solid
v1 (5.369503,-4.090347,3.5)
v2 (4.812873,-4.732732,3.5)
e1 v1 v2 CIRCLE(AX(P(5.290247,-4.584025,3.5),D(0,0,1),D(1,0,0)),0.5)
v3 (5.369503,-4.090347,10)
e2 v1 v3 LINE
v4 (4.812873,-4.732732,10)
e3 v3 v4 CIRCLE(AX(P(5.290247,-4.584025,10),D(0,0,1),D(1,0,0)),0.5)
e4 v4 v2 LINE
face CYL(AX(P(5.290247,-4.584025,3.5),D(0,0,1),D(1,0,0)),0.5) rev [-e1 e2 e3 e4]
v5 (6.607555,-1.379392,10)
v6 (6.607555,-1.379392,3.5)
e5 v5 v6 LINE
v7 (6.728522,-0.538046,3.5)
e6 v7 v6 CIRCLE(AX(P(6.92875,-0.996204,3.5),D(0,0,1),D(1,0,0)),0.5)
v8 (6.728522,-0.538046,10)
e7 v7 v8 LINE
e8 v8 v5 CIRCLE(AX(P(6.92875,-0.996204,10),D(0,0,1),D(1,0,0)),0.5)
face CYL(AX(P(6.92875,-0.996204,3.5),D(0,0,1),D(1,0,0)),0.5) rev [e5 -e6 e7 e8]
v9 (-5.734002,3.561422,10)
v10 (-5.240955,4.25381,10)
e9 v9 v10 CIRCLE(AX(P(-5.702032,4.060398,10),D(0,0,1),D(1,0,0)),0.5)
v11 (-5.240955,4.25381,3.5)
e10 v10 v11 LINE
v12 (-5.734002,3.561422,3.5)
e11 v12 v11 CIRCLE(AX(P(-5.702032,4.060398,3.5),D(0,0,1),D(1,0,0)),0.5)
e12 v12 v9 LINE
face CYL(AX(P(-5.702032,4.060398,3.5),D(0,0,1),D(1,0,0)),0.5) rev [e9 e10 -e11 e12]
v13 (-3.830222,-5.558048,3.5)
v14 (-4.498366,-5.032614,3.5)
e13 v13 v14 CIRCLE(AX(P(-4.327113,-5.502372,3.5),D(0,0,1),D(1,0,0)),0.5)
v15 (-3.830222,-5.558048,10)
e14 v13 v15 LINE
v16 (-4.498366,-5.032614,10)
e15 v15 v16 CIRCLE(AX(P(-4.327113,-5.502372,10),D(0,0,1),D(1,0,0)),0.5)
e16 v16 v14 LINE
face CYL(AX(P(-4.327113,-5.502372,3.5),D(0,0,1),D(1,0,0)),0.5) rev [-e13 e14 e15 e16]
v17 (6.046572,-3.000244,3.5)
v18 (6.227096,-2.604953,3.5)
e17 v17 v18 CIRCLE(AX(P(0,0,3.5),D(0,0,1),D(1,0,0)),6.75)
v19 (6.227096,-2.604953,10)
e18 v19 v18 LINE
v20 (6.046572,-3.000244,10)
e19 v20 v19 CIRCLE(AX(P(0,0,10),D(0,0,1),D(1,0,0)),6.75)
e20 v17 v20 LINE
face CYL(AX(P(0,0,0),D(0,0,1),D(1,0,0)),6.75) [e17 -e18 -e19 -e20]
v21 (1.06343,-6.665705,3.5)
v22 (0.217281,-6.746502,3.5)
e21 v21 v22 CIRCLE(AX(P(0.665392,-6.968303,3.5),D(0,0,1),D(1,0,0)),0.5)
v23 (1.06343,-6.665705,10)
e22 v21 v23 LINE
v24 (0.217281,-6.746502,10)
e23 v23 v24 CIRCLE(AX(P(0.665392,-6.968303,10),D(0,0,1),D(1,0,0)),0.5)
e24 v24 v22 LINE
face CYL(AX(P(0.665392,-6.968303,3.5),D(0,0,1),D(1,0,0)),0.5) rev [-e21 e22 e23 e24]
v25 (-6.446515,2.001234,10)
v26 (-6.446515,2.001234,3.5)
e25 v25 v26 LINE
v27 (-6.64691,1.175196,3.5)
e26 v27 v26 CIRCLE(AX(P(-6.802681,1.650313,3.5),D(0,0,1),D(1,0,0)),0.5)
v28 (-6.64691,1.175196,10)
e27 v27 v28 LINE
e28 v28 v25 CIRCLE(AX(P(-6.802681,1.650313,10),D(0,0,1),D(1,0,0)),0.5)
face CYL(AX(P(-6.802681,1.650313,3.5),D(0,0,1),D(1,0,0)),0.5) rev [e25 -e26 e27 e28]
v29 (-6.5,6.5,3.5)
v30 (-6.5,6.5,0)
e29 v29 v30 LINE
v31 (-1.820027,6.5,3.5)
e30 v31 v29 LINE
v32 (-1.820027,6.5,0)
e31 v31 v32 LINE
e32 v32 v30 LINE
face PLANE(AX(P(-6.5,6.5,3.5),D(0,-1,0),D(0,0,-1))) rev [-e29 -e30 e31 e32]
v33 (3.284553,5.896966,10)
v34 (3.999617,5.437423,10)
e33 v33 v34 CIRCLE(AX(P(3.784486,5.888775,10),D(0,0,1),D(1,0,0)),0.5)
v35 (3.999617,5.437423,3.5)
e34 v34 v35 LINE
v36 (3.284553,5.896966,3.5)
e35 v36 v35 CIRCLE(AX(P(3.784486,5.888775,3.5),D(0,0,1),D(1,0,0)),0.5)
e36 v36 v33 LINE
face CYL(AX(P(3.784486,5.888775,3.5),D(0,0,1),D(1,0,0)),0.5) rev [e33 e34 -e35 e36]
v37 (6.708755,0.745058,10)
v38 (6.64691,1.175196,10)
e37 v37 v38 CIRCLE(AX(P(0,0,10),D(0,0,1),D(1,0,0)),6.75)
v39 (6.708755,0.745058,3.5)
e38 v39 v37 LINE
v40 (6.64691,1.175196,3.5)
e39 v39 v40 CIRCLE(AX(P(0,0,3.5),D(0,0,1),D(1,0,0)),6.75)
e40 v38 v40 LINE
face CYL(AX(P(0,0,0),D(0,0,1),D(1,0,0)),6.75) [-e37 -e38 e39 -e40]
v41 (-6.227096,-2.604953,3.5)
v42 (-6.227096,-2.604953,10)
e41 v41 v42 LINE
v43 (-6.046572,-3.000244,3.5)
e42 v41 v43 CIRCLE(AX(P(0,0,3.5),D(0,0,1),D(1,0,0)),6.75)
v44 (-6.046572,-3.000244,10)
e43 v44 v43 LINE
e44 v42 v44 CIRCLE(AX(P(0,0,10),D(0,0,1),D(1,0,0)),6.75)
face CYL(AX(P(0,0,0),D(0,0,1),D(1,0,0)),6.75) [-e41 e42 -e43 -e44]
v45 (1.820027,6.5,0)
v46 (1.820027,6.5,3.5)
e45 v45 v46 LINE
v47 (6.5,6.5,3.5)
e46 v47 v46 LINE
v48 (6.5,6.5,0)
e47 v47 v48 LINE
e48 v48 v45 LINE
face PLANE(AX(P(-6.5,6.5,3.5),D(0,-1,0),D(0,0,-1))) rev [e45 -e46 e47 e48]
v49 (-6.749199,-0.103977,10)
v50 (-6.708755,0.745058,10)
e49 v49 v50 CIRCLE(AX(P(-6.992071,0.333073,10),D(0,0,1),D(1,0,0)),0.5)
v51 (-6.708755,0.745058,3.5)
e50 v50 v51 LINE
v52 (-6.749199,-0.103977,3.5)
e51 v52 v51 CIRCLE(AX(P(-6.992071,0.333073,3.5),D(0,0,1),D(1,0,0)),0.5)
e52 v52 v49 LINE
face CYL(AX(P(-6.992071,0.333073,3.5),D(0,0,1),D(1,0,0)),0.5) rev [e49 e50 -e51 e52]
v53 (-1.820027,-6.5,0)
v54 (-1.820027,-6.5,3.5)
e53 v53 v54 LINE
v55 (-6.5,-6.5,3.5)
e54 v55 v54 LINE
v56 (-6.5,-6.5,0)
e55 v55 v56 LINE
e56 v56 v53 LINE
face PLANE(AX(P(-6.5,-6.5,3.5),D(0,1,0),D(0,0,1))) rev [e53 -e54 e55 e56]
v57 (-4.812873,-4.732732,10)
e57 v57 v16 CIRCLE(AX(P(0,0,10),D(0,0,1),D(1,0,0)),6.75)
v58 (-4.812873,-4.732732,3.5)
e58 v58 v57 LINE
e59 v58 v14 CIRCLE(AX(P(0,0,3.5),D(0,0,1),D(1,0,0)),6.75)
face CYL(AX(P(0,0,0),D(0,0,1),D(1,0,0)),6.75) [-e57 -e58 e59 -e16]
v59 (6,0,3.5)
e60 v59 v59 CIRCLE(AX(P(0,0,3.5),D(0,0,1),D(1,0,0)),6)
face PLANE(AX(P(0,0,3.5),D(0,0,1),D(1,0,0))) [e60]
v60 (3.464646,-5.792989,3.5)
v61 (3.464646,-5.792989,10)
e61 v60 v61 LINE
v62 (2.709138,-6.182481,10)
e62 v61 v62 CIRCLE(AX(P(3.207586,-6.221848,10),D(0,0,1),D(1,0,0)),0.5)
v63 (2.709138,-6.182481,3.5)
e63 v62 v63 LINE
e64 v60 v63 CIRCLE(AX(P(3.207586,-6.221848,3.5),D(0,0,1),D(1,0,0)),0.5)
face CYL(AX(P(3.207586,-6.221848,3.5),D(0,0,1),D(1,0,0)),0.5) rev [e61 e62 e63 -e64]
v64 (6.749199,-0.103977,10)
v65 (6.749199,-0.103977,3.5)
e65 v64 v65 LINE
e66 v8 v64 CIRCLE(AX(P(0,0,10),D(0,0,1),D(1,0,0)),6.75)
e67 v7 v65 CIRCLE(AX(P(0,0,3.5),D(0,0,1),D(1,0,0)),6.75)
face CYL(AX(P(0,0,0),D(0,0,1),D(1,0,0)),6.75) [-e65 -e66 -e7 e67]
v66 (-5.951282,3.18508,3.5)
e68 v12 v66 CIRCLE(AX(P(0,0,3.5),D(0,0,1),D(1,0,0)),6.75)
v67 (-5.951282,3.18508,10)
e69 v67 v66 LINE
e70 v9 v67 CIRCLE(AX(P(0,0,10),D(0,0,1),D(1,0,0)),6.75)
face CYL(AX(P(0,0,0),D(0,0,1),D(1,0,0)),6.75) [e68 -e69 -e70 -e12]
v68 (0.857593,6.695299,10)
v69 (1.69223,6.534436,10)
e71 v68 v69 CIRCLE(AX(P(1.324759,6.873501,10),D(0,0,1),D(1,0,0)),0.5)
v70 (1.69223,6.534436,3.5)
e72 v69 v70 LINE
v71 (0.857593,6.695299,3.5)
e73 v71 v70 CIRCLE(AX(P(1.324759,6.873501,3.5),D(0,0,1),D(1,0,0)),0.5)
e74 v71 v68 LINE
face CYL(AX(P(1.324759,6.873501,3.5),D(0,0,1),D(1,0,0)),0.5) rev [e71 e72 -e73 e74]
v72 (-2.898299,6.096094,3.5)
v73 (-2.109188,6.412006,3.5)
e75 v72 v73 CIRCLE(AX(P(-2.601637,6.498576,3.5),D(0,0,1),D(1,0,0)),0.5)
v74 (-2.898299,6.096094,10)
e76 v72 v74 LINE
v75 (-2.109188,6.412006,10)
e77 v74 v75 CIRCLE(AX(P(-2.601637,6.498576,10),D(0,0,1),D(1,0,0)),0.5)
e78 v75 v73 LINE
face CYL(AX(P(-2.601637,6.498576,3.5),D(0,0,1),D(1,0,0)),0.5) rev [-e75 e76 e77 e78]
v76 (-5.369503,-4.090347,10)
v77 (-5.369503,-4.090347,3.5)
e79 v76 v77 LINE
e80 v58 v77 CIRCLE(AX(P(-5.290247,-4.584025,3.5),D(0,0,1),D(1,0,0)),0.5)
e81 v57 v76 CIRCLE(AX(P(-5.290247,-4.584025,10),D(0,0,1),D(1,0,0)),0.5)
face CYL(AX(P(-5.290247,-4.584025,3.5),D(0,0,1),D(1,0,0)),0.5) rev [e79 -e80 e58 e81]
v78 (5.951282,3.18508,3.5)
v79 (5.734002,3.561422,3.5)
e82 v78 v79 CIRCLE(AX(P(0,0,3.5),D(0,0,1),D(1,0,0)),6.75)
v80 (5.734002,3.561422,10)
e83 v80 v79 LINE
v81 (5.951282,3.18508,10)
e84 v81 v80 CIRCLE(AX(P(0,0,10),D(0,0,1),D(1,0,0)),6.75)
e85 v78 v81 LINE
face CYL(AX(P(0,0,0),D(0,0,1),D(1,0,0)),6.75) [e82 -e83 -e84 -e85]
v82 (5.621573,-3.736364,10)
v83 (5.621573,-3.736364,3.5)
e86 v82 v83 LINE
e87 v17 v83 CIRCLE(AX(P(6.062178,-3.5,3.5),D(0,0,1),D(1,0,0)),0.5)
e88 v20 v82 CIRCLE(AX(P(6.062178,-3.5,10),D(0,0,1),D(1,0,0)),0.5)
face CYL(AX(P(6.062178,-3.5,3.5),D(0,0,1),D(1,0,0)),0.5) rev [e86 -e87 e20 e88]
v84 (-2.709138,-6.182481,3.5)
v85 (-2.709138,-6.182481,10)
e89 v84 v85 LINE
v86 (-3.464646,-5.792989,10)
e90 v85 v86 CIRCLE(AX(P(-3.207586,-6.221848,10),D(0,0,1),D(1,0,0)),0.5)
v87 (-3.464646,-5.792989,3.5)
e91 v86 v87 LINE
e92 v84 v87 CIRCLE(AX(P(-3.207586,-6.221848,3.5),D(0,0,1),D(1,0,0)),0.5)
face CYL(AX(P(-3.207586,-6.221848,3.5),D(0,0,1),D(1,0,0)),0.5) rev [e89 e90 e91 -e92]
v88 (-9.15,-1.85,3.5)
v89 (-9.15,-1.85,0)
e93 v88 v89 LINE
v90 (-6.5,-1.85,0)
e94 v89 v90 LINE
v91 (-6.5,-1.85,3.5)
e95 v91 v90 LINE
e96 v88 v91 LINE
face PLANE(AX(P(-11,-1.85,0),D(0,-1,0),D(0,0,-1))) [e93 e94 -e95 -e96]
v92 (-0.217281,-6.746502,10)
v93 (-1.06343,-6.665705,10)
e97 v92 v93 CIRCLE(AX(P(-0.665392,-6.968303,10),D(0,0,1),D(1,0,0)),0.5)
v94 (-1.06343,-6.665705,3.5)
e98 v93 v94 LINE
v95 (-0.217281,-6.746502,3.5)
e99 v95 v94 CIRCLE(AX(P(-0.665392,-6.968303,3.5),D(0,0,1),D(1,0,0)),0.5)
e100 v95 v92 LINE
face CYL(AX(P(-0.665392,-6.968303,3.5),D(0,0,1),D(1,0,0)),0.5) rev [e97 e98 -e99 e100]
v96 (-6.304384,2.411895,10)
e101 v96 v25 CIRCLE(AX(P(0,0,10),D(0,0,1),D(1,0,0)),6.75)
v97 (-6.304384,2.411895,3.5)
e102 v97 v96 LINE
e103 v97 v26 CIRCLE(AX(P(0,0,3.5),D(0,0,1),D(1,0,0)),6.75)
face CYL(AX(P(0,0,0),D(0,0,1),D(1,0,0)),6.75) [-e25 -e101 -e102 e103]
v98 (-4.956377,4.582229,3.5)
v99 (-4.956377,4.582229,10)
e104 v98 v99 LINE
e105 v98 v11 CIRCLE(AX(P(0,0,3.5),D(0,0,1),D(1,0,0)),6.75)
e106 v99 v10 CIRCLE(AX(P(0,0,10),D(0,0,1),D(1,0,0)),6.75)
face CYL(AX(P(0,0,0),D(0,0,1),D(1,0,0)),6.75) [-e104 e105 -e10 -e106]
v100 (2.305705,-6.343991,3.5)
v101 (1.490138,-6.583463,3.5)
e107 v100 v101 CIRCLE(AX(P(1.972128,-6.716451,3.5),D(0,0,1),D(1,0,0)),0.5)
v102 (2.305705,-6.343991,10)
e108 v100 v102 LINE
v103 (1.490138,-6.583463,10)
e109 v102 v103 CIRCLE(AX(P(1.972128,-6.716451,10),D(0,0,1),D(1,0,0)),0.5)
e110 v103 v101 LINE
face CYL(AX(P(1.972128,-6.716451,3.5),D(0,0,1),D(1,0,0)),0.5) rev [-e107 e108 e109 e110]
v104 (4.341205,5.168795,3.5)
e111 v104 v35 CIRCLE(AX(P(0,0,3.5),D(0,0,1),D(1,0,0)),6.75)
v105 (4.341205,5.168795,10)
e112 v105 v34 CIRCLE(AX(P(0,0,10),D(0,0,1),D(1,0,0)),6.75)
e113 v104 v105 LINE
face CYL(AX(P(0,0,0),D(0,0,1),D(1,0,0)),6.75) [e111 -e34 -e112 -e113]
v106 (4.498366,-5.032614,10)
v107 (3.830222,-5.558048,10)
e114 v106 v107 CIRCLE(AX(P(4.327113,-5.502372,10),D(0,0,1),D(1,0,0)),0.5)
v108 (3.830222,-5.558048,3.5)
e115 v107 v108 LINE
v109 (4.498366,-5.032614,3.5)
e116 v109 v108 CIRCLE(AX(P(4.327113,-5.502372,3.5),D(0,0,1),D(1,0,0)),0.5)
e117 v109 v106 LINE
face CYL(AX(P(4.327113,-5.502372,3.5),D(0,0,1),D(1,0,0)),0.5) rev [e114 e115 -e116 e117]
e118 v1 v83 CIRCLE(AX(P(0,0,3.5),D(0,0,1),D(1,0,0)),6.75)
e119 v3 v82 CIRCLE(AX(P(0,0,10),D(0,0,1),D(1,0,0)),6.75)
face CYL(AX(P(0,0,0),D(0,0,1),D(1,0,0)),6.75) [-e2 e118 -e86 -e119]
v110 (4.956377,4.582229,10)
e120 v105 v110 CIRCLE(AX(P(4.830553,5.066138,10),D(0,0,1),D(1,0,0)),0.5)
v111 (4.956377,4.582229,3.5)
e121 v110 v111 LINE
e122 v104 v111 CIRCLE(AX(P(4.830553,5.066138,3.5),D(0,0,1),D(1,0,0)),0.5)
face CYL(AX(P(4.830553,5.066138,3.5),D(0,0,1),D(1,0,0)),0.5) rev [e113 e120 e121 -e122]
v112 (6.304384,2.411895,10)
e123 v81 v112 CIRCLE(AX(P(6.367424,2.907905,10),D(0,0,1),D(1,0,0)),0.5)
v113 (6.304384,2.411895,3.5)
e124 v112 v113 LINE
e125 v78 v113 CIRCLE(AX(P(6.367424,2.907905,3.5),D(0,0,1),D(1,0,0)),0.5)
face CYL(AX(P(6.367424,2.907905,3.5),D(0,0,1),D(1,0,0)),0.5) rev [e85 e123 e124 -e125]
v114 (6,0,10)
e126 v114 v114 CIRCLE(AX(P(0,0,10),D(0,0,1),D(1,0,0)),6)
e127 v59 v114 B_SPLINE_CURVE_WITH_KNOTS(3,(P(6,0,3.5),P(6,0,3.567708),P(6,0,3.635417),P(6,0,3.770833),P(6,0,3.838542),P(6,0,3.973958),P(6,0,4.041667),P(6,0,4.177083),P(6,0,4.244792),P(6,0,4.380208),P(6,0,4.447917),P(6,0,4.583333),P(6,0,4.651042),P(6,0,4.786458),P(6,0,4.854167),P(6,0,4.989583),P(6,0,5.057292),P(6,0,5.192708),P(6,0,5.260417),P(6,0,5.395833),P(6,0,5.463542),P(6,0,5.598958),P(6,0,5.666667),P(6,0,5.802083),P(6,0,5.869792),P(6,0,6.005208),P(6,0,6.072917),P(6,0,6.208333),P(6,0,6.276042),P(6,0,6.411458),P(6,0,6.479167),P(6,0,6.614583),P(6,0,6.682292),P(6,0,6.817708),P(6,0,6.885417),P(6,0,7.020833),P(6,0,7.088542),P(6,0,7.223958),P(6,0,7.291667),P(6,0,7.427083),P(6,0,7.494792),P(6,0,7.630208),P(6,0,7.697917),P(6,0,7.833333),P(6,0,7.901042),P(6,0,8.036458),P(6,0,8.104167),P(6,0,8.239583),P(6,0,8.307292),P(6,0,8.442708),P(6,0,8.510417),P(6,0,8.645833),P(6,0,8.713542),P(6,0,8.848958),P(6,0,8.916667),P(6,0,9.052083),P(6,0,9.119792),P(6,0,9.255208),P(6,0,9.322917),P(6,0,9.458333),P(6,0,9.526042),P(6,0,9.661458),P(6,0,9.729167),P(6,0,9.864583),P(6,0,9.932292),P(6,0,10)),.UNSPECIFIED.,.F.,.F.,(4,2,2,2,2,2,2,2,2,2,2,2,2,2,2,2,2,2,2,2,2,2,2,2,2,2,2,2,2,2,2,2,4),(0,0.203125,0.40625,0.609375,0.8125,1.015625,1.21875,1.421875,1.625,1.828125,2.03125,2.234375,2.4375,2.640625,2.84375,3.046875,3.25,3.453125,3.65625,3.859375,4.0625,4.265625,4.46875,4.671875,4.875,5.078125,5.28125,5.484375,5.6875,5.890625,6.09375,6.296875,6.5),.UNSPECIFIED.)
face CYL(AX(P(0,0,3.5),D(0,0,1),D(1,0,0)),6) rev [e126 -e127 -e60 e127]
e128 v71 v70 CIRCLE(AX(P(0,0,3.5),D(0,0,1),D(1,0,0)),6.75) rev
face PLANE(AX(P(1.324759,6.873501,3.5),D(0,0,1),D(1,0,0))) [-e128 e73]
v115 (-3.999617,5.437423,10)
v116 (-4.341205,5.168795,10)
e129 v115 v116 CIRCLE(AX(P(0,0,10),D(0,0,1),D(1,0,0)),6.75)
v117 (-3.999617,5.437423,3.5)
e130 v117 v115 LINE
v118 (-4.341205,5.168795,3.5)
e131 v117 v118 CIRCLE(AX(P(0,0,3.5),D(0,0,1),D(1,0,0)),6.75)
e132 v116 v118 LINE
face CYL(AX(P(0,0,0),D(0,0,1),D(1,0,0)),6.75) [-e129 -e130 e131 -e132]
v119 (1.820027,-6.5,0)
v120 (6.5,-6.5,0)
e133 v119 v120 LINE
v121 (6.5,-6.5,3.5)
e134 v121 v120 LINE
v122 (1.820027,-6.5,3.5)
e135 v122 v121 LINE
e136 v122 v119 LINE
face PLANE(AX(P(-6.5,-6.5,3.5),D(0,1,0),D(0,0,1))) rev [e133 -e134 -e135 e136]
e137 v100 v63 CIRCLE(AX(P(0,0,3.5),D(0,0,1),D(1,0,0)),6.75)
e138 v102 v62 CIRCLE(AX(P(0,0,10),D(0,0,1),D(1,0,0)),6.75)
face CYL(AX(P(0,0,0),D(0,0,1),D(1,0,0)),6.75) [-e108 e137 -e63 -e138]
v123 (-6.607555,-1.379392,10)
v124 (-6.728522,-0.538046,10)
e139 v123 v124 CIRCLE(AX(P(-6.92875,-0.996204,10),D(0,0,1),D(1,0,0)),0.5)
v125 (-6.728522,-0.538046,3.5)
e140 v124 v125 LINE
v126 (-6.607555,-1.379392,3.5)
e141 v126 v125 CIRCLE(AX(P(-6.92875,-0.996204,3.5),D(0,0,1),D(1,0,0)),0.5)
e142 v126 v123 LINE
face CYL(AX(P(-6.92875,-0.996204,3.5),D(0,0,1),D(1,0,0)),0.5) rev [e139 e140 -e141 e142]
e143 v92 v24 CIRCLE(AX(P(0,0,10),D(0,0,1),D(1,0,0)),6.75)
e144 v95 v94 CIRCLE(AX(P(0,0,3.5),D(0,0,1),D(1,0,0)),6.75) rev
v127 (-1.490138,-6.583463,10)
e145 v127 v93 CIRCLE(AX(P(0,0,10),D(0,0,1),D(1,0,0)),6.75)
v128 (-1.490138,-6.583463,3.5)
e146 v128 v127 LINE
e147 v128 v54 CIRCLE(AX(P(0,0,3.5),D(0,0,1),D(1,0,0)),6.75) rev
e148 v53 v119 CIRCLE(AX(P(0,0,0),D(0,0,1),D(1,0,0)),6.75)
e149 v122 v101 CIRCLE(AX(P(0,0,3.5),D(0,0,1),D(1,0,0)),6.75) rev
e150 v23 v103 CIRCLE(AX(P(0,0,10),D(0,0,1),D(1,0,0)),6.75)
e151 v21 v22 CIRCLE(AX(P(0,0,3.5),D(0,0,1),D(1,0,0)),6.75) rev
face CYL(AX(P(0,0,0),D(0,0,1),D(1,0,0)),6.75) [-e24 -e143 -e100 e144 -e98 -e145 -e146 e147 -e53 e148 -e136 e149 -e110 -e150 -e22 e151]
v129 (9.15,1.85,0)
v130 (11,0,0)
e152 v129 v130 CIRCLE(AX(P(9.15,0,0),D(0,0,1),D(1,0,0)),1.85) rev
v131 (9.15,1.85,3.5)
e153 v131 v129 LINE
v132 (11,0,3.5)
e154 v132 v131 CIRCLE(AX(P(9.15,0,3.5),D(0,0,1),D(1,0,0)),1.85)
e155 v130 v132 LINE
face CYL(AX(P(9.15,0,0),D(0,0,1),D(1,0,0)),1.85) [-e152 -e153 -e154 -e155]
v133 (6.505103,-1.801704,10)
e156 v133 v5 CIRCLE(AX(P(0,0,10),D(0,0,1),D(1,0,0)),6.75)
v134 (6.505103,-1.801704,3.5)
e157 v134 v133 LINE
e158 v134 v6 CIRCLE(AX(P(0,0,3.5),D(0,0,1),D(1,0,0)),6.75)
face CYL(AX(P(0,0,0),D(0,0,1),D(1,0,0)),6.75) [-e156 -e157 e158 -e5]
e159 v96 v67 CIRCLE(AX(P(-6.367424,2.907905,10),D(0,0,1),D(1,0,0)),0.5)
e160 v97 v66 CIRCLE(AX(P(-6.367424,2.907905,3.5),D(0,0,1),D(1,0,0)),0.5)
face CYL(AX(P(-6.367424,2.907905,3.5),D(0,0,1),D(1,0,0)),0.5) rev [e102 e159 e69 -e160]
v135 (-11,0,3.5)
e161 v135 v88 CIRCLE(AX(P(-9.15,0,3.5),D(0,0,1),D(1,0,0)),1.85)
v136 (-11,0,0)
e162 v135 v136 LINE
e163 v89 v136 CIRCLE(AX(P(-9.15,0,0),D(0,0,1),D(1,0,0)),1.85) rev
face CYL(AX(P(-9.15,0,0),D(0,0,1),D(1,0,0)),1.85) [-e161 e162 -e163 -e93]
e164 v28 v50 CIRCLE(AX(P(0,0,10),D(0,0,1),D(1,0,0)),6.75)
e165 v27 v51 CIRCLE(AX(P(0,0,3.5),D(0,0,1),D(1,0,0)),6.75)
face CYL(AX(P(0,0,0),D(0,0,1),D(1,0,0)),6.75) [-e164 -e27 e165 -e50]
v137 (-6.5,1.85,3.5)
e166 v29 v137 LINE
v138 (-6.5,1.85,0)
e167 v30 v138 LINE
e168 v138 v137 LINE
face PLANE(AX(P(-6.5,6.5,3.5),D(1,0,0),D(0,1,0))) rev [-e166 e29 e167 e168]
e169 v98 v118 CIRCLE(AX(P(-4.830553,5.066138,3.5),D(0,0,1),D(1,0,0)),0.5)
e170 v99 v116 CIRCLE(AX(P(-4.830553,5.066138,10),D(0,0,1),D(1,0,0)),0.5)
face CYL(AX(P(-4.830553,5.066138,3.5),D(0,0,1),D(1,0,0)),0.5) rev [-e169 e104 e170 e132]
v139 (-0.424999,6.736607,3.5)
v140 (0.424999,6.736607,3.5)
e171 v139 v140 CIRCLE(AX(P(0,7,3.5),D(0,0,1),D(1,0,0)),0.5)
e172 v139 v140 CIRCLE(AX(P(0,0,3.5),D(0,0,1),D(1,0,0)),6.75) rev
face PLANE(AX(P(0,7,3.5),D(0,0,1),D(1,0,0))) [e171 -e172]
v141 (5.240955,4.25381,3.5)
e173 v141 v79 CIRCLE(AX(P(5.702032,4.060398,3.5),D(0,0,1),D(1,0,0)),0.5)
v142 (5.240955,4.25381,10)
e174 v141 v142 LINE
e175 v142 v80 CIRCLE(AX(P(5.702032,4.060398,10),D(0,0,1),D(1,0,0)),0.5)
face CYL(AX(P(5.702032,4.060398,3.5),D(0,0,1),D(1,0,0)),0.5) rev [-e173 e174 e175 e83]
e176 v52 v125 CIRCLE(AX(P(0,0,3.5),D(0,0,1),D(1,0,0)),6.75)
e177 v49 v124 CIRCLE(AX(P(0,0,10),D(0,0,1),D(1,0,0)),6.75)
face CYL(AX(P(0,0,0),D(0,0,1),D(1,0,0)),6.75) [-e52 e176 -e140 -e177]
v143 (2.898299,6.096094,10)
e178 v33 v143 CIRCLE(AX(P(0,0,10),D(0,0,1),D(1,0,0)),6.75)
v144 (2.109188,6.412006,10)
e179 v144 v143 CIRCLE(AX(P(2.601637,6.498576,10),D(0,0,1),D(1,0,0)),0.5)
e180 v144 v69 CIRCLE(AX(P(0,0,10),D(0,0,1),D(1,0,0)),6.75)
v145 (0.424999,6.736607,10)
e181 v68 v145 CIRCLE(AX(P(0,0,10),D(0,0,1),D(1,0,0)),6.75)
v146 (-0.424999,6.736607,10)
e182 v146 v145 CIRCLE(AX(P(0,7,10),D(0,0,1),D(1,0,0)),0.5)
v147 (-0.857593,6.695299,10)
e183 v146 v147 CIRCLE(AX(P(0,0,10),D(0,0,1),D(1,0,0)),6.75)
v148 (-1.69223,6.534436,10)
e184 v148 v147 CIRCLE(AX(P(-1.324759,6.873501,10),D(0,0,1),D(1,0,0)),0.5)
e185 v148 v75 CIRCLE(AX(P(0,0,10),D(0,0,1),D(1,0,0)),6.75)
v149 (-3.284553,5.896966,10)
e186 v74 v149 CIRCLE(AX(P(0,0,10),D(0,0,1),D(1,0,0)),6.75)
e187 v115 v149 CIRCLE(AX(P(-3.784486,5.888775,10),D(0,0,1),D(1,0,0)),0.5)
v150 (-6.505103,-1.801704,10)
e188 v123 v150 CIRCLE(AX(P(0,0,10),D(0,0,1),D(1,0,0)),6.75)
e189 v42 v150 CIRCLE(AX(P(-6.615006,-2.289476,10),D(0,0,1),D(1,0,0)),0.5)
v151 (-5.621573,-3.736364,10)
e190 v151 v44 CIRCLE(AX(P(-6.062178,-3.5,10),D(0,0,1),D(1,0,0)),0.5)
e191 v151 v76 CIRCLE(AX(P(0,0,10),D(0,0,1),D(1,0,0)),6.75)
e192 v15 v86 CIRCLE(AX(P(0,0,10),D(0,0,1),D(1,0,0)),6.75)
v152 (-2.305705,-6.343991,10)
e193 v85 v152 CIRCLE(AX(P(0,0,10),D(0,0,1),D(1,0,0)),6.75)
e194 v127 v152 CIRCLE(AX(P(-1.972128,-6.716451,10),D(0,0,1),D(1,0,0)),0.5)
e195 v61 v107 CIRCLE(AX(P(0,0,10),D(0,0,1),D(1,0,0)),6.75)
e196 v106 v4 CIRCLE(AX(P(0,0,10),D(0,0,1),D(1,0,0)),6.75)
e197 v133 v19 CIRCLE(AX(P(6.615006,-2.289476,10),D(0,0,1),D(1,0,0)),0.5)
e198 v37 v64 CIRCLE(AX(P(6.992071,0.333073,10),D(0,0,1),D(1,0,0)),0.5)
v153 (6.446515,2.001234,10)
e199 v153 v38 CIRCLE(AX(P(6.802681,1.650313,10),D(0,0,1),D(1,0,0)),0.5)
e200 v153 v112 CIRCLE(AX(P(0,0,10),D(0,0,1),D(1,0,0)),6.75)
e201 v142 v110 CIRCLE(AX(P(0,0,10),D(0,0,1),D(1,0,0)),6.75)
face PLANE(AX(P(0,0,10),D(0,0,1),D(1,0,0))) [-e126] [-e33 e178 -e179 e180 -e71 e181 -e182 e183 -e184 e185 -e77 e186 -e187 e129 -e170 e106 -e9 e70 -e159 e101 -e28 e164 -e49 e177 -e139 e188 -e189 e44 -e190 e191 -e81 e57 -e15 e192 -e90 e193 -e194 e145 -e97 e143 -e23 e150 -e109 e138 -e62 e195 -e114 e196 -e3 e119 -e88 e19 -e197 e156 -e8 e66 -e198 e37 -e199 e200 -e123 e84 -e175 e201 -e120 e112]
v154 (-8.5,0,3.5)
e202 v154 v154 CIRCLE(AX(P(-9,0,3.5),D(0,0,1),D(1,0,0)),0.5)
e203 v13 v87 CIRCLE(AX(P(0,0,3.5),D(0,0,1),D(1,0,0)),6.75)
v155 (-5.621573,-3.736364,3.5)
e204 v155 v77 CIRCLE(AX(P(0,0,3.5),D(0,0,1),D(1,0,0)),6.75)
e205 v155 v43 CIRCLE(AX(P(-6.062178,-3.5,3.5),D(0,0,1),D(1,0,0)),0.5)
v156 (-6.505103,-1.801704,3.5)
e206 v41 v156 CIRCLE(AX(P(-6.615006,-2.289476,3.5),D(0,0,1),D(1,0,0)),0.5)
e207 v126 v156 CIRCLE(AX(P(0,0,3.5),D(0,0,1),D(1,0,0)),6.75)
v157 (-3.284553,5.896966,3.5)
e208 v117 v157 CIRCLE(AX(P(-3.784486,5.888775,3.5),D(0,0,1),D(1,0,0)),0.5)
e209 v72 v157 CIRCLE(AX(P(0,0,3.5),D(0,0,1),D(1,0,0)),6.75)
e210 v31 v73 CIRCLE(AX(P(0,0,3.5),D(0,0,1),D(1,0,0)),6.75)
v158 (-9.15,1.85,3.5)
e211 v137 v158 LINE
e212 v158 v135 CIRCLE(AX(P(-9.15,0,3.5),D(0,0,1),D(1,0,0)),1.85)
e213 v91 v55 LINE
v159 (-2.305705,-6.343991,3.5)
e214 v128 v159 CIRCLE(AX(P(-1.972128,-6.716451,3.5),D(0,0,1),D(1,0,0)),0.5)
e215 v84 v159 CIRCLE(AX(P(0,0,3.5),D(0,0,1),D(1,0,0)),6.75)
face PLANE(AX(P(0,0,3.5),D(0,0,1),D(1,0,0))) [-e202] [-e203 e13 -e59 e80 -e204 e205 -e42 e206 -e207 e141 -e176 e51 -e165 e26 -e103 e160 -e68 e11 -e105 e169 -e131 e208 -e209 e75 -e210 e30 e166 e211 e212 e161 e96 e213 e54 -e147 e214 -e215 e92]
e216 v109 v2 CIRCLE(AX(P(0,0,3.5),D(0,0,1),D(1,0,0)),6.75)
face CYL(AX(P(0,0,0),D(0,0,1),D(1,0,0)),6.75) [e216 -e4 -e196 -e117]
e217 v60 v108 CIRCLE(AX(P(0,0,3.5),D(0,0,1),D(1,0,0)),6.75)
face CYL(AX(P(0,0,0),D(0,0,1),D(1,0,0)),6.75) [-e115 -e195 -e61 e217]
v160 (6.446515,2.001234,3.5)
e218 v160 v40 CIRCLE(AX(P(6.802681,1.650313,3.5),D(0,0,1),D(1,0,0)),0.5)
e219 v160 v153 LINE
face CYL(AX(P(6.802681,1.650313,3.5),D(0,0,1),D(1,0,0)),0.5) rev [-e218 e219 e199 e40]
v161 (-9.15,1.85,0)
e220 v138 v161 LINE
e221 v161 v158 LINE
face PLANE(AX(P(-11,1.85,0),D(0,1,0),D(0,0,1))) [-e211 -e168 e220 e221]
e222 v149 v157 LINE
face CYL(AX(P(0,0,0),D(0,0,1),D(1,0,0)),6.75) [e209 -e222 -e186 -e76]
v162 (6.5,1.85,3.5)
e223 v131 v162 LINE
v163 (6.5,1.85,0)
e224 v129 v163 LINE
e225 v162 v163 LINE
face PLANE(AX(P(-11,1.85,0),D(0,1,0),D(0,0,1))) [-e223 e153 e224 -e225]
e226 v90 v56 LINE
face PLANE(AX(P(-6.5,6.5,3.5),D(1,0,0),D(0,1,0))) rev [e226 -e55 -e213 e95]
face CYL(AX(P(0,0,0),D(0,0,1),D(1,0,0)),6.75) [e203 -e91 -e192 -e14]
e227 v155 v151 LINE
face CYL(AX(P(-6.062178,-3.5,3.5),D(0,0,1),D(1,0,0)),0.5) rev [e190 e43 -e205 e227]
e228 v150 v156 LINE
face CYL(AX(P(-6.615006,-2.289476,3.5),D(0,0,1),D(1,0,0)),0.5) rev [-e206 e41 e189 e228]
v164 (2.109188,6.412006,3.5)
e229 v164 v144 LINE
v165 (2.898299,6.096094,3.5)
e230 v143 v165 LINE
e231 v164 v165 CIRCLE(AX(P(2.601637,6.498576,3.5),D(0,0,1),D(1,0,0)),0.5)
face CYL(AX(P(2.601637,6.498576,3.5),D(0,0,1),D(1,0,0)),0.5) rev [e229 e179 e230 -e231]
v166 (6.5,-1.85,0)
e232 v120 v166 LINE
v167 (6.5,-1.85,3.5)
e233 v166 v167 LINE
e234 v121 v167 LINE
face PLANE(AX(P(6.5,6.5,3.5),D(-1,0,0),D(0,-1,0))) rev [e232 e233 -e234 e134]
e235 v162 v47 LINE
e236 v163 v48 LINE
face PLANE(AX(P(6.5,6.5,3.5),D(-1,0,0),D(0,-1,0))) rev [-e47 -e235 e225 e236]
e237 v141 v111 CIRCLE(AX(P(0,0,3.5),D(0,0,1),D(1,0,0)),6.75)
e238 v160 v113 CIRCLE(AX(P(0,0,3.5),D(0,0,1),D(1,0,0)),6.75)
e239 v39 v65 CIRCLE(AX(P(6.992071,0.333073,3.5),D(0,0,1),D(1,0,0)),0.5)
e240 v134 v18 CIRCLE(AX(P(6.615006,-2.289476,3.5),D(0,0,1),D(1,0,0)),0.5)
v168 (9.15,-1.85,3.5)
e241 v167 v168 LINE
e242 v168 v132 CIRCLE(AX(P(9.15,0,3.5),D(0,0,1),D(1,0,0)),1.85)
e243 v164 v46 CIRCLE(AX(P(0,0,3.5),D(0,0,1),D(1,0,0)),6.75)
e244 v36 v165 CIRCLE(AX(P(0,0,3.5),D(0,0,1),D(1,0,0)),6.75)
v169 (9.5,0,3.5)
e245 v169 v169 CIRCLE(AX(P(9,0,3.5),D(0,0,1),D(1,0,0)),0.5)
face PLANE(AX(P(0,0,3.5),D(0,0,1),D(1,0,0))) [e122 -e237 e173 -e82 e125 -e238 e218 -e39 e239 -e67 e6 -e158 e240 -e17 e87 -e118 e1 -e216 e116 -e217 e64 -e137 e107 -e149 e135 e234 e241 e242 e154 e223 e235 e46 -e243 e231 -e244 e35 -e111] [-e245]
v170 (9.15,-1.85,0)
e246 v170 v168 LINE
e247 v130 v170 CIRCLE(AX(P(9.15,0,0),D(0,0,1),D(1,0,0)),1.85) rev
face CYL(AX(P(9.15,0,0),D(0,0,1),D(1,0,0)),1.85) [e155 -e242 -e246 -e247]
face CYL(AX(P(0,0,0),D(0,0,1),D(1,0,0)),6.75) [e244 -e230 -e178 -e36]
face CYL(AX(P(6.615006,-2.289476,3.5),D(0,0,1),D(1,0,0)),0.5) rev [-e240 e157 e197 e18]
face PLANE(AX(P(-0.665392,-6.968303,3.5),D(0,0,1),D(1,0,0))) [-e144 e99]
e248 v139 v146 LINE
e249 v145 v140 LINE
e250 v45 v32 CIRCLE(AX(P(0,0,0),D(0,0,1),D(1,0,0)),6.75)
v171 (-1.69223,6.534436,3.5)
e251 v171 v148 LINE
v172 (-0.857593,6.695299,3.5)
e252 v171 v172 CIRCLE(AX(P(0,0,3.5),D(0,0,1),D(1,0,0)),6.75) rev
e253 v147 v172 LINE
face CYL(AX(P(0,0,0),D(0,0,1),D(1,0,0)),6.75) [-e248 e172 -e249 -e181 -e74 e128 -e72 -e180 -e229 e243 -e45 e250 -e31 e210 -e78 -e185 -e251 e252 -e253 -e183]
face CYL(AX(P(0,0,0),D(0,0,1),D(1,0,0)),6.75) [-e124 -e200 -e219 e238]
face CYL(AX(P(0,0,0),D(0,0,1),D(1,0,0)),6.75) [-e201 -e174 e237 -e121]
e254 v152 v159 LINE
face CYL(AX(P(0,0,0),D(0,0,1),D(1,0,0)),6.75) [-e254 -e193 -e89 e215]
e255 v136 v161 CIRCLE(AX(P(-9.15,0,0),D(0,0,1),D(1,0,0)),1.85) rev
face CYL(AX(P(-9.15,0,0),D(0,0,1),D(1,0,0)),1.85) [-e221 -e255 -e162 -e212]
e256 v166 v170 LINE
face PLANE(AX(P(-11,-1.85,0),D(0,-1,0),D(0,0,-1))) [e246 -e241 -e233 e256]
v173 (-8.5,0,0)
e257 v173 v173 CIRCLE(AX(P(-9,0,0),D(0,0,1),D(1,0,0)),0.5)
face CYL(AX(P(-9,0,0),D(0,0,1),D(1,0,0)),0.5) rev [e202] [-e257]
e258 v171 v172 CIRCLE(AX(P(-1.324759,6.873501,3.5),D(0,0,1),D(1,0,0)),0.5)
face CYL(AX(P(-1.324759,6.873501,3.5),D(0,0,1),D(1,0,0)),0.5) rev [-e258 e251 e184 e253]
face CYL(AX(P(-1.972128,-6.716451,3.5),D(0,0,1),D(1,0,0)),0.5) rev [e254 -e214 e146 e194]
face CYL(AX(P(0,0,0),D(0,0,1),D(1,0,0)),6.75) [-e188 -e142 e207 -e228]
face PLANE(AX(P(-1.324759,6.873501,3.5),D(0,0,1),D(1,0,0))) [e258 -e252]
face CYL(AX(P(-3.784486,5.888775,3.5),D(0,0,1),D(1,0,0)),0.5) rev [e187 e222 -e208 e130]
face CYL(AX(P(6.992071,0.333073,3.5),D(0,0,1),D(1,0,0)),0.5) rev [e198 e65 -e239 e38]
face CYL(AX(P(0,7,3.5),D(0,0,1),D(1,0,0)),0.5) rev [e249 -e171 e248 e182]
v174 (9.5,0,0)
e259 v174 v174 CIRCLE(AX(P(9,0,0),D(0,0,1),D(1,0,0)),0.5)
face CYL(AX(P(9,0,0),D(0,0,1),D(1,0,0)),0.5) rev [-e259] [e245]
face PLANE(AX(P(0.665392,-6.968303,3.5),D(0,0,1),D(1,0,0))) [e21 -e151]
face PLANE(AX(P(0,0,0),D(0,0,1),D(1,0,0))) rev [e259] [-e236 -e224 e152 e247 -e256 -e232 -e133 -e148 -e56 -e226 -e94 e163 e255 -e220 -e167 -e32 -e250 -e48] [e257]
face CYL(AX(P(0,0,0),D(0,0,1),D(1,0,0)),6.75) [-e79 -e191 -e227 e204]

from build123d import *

# Parameters (mm, degrees)
SKETCH1_W                = 13
SKETCH1_H                = 13
BOSS_EXTRUDE1_DEPTH      = 3.5
SKETCH2_W                = 22
SKETCH2_H                = 3.7
BOSS_EXTRUDE2_DEPTH      = 3.5
FILLET1_R                = 1.85
SKETCH3_R                = 0.5
CUT_EXTRUDE1_DEPTH       = 3.5
BOSS_EXTRUDE3_DEPTH      = 6.5
BOSS_EXTRUDE3_DEPTH_BACK = 3.5
SKETCH4_R                = 6.75
SKETCH5_R                = 0.5
CUT_EXTRUDE2_DEPTH       = 6.5
SKETCH6_R                = 6
CUT_EXTRUDE3_DEPTH       = 6.5


with BuildPart() as part:
    # Sketch1 → Boss-Extrude1 (new body)
    with BuildSketch(Plane.XY):
        Rectangle(SKETCH1_W, SKETCH1_H)
    extrude(amount=BOSS_EXTRUDE1_DEPTH)

    # Sketch2 → Boss-Extrude2 (add)
    with BuildSketch(Plane.XY.offset(3.5)):
        Rectangle(SKETCH2_W, SKETCH2_H)
    extrude(amount=-BOSS_EXTRUDE2_DEPTH)

    # Fillet1
    fillet1_edges = [part.edges().sort_by_distance(p)[0] for p in [
        (11, -1.85, 1.75),
        (11, 1.85, 1.75),
        (-11, -1.85, 1.75),
        (-11, 1.85, 1.75),
    ]]
    fillet(fillet1_edges, radius=FILLET1_R - 0.0001)  # a hair under: the kernel refuses the full size

    # Sketch3 → Cut-Extrude1 (cut)
    with BuildSketch(Plane.XY.offset(3.5)):
        with Locations((-9, 0)):
            Circle(SKETCH3_R)
        with Locations((9, 0)):
            Circle(SKETCH3_R)
    extrude(amount=-CUT_EXTRUDE1_DEPTH, mode=Mode.SUBTRACT)

    # Sketch4 → Boss-Extrude3 (add, two sides: drawn at the far end of the back side and taken through both)
    with BuildSketch(Plane.XY.offset(3.5).offset(-BOSS_EXTRUDE3_DEPTH_BACK)):
        Circle(SKETCH4_R)
    extrude(amount=BOSS_EXTRUDE3_DEPTH + BOSS_EXTRUDE3_DEPTH_BACK)

    # Sketch5 → Cut-Extrude2 (cut)
    with BuildSketch(Plane.XY.offset(10)):
        with Locations((0, 7)):
            Circle(SKETCH5_R)
        with Locations((1.324758711, 6.873500881)):
            Circle(SKETCH5_R)
        with Locations((2.60163719, 6.498575531)):
            Circle(SKETCH5_R)
        with Locations((3.784485722, 5.88877473)):
            Circle(SKETCH5_R)
        with Locations((4.83055308, 5.066138267)):
            Circle(SKETCH5_R)
        with Locations((5.702031664, 4.060398367)):
            Circle(SKETCH5_R)
        with Locations((6.367423967, 2.907905091)):
            Circle(SKETCH5_R)
        with Locations((6.802680978, 1.650312549)):
            Circle(SKETCH5_R)
        with Locations((6.992071374, 0.333073411)):
            Circle(SKETCH5_R)
        with Locations((6.928750093, -0.996203868)):
            Circle(SKETCH5_R)
        with Locations((6.615005731, -2.289475743)):
            Circle(SKETCH5_R)
        with Locations((6.062177826, -3.5)):
            Circle(SKETCH5_R)
        with Locations((5.29024702, -4.584025138)):
            Circle(SKETCH5_R)
        with Locations((4.327112904, -5.502371663)):
            Circle(SKETCH5_R)
        with Locations((3.207585652, -6.221848141)):
            Circle(SKETCH5_R)
        with Locations((1.972127898, -6.716450815)):
            Circle(SKETCH5_R)
        with Locations((0.665392303, -6.968303458)):
            Circle(SKETCH5_R)
        with Locations((-0.665392303, -6.968303458)):
            Circle(SKETCH5_R)
        with Locations((-1.972127898, -6.716450815)):
            Circle(SKETCH5_R)
        with Locations((-3.207585652, -6.221848141)):
            Circle(SKETCH5_R)
        with Locations((-4.327112904, -5.502371663)):
            Circle(SKETCH5_R)
        with Locations((-5.29024702, -4.584025138)):
            Circle(SKETCH5_R)
        with Locations((-6.062177826, -3.5)):
            Circle(SKETCH5_R)
        with Locations((-6.615005731, -2.289475743)):
            Circle(SKETCH5_R)
        with Locations((-6.928750093, -0.996203868)):
            Circle(SKETCH5_R)
        with Locations((-6.992071374, 0.333073411)):
            Circle(SKETCH5_R)
        with Locations((-6.802680978, 1.650312549)):
            Circle(SKETCH5_R)
        with Locations((-6.367423967, 2.907905091)):
            Circle(SKETCH5_R)
        with Locations((-5.702031664, 4.060398367)):
            Circle(SKETCH5_R)
        with Locations((-4.83055308, 5.066138267)):
            Circle(SKETCH5_R)
        with Locations((-3.784485722, 5.88877473)):
            Circle(SKETCH5_R)
        with Locations((-2.60163719, 6.498575531)):
            Circle(SKETCH5_R)
        with Locations((-1.324758711, 6.873500881)):
            Circle(SKETCH5_R)
    extrude(amount=-CUT_EXTRUDE2_DEPTH, mode=Mode.SUBTRACT)

    # Sketch6 → Cut-Extrude3 (cut)
    with BuildSketch(Plane.XY.offset(10)):
        Circle(SKETCH6_R)
    extrude(amount=-CUT_EXTRUDE3_DEPTH, mode=Mode.SUBTRACT)


solid = part.part
